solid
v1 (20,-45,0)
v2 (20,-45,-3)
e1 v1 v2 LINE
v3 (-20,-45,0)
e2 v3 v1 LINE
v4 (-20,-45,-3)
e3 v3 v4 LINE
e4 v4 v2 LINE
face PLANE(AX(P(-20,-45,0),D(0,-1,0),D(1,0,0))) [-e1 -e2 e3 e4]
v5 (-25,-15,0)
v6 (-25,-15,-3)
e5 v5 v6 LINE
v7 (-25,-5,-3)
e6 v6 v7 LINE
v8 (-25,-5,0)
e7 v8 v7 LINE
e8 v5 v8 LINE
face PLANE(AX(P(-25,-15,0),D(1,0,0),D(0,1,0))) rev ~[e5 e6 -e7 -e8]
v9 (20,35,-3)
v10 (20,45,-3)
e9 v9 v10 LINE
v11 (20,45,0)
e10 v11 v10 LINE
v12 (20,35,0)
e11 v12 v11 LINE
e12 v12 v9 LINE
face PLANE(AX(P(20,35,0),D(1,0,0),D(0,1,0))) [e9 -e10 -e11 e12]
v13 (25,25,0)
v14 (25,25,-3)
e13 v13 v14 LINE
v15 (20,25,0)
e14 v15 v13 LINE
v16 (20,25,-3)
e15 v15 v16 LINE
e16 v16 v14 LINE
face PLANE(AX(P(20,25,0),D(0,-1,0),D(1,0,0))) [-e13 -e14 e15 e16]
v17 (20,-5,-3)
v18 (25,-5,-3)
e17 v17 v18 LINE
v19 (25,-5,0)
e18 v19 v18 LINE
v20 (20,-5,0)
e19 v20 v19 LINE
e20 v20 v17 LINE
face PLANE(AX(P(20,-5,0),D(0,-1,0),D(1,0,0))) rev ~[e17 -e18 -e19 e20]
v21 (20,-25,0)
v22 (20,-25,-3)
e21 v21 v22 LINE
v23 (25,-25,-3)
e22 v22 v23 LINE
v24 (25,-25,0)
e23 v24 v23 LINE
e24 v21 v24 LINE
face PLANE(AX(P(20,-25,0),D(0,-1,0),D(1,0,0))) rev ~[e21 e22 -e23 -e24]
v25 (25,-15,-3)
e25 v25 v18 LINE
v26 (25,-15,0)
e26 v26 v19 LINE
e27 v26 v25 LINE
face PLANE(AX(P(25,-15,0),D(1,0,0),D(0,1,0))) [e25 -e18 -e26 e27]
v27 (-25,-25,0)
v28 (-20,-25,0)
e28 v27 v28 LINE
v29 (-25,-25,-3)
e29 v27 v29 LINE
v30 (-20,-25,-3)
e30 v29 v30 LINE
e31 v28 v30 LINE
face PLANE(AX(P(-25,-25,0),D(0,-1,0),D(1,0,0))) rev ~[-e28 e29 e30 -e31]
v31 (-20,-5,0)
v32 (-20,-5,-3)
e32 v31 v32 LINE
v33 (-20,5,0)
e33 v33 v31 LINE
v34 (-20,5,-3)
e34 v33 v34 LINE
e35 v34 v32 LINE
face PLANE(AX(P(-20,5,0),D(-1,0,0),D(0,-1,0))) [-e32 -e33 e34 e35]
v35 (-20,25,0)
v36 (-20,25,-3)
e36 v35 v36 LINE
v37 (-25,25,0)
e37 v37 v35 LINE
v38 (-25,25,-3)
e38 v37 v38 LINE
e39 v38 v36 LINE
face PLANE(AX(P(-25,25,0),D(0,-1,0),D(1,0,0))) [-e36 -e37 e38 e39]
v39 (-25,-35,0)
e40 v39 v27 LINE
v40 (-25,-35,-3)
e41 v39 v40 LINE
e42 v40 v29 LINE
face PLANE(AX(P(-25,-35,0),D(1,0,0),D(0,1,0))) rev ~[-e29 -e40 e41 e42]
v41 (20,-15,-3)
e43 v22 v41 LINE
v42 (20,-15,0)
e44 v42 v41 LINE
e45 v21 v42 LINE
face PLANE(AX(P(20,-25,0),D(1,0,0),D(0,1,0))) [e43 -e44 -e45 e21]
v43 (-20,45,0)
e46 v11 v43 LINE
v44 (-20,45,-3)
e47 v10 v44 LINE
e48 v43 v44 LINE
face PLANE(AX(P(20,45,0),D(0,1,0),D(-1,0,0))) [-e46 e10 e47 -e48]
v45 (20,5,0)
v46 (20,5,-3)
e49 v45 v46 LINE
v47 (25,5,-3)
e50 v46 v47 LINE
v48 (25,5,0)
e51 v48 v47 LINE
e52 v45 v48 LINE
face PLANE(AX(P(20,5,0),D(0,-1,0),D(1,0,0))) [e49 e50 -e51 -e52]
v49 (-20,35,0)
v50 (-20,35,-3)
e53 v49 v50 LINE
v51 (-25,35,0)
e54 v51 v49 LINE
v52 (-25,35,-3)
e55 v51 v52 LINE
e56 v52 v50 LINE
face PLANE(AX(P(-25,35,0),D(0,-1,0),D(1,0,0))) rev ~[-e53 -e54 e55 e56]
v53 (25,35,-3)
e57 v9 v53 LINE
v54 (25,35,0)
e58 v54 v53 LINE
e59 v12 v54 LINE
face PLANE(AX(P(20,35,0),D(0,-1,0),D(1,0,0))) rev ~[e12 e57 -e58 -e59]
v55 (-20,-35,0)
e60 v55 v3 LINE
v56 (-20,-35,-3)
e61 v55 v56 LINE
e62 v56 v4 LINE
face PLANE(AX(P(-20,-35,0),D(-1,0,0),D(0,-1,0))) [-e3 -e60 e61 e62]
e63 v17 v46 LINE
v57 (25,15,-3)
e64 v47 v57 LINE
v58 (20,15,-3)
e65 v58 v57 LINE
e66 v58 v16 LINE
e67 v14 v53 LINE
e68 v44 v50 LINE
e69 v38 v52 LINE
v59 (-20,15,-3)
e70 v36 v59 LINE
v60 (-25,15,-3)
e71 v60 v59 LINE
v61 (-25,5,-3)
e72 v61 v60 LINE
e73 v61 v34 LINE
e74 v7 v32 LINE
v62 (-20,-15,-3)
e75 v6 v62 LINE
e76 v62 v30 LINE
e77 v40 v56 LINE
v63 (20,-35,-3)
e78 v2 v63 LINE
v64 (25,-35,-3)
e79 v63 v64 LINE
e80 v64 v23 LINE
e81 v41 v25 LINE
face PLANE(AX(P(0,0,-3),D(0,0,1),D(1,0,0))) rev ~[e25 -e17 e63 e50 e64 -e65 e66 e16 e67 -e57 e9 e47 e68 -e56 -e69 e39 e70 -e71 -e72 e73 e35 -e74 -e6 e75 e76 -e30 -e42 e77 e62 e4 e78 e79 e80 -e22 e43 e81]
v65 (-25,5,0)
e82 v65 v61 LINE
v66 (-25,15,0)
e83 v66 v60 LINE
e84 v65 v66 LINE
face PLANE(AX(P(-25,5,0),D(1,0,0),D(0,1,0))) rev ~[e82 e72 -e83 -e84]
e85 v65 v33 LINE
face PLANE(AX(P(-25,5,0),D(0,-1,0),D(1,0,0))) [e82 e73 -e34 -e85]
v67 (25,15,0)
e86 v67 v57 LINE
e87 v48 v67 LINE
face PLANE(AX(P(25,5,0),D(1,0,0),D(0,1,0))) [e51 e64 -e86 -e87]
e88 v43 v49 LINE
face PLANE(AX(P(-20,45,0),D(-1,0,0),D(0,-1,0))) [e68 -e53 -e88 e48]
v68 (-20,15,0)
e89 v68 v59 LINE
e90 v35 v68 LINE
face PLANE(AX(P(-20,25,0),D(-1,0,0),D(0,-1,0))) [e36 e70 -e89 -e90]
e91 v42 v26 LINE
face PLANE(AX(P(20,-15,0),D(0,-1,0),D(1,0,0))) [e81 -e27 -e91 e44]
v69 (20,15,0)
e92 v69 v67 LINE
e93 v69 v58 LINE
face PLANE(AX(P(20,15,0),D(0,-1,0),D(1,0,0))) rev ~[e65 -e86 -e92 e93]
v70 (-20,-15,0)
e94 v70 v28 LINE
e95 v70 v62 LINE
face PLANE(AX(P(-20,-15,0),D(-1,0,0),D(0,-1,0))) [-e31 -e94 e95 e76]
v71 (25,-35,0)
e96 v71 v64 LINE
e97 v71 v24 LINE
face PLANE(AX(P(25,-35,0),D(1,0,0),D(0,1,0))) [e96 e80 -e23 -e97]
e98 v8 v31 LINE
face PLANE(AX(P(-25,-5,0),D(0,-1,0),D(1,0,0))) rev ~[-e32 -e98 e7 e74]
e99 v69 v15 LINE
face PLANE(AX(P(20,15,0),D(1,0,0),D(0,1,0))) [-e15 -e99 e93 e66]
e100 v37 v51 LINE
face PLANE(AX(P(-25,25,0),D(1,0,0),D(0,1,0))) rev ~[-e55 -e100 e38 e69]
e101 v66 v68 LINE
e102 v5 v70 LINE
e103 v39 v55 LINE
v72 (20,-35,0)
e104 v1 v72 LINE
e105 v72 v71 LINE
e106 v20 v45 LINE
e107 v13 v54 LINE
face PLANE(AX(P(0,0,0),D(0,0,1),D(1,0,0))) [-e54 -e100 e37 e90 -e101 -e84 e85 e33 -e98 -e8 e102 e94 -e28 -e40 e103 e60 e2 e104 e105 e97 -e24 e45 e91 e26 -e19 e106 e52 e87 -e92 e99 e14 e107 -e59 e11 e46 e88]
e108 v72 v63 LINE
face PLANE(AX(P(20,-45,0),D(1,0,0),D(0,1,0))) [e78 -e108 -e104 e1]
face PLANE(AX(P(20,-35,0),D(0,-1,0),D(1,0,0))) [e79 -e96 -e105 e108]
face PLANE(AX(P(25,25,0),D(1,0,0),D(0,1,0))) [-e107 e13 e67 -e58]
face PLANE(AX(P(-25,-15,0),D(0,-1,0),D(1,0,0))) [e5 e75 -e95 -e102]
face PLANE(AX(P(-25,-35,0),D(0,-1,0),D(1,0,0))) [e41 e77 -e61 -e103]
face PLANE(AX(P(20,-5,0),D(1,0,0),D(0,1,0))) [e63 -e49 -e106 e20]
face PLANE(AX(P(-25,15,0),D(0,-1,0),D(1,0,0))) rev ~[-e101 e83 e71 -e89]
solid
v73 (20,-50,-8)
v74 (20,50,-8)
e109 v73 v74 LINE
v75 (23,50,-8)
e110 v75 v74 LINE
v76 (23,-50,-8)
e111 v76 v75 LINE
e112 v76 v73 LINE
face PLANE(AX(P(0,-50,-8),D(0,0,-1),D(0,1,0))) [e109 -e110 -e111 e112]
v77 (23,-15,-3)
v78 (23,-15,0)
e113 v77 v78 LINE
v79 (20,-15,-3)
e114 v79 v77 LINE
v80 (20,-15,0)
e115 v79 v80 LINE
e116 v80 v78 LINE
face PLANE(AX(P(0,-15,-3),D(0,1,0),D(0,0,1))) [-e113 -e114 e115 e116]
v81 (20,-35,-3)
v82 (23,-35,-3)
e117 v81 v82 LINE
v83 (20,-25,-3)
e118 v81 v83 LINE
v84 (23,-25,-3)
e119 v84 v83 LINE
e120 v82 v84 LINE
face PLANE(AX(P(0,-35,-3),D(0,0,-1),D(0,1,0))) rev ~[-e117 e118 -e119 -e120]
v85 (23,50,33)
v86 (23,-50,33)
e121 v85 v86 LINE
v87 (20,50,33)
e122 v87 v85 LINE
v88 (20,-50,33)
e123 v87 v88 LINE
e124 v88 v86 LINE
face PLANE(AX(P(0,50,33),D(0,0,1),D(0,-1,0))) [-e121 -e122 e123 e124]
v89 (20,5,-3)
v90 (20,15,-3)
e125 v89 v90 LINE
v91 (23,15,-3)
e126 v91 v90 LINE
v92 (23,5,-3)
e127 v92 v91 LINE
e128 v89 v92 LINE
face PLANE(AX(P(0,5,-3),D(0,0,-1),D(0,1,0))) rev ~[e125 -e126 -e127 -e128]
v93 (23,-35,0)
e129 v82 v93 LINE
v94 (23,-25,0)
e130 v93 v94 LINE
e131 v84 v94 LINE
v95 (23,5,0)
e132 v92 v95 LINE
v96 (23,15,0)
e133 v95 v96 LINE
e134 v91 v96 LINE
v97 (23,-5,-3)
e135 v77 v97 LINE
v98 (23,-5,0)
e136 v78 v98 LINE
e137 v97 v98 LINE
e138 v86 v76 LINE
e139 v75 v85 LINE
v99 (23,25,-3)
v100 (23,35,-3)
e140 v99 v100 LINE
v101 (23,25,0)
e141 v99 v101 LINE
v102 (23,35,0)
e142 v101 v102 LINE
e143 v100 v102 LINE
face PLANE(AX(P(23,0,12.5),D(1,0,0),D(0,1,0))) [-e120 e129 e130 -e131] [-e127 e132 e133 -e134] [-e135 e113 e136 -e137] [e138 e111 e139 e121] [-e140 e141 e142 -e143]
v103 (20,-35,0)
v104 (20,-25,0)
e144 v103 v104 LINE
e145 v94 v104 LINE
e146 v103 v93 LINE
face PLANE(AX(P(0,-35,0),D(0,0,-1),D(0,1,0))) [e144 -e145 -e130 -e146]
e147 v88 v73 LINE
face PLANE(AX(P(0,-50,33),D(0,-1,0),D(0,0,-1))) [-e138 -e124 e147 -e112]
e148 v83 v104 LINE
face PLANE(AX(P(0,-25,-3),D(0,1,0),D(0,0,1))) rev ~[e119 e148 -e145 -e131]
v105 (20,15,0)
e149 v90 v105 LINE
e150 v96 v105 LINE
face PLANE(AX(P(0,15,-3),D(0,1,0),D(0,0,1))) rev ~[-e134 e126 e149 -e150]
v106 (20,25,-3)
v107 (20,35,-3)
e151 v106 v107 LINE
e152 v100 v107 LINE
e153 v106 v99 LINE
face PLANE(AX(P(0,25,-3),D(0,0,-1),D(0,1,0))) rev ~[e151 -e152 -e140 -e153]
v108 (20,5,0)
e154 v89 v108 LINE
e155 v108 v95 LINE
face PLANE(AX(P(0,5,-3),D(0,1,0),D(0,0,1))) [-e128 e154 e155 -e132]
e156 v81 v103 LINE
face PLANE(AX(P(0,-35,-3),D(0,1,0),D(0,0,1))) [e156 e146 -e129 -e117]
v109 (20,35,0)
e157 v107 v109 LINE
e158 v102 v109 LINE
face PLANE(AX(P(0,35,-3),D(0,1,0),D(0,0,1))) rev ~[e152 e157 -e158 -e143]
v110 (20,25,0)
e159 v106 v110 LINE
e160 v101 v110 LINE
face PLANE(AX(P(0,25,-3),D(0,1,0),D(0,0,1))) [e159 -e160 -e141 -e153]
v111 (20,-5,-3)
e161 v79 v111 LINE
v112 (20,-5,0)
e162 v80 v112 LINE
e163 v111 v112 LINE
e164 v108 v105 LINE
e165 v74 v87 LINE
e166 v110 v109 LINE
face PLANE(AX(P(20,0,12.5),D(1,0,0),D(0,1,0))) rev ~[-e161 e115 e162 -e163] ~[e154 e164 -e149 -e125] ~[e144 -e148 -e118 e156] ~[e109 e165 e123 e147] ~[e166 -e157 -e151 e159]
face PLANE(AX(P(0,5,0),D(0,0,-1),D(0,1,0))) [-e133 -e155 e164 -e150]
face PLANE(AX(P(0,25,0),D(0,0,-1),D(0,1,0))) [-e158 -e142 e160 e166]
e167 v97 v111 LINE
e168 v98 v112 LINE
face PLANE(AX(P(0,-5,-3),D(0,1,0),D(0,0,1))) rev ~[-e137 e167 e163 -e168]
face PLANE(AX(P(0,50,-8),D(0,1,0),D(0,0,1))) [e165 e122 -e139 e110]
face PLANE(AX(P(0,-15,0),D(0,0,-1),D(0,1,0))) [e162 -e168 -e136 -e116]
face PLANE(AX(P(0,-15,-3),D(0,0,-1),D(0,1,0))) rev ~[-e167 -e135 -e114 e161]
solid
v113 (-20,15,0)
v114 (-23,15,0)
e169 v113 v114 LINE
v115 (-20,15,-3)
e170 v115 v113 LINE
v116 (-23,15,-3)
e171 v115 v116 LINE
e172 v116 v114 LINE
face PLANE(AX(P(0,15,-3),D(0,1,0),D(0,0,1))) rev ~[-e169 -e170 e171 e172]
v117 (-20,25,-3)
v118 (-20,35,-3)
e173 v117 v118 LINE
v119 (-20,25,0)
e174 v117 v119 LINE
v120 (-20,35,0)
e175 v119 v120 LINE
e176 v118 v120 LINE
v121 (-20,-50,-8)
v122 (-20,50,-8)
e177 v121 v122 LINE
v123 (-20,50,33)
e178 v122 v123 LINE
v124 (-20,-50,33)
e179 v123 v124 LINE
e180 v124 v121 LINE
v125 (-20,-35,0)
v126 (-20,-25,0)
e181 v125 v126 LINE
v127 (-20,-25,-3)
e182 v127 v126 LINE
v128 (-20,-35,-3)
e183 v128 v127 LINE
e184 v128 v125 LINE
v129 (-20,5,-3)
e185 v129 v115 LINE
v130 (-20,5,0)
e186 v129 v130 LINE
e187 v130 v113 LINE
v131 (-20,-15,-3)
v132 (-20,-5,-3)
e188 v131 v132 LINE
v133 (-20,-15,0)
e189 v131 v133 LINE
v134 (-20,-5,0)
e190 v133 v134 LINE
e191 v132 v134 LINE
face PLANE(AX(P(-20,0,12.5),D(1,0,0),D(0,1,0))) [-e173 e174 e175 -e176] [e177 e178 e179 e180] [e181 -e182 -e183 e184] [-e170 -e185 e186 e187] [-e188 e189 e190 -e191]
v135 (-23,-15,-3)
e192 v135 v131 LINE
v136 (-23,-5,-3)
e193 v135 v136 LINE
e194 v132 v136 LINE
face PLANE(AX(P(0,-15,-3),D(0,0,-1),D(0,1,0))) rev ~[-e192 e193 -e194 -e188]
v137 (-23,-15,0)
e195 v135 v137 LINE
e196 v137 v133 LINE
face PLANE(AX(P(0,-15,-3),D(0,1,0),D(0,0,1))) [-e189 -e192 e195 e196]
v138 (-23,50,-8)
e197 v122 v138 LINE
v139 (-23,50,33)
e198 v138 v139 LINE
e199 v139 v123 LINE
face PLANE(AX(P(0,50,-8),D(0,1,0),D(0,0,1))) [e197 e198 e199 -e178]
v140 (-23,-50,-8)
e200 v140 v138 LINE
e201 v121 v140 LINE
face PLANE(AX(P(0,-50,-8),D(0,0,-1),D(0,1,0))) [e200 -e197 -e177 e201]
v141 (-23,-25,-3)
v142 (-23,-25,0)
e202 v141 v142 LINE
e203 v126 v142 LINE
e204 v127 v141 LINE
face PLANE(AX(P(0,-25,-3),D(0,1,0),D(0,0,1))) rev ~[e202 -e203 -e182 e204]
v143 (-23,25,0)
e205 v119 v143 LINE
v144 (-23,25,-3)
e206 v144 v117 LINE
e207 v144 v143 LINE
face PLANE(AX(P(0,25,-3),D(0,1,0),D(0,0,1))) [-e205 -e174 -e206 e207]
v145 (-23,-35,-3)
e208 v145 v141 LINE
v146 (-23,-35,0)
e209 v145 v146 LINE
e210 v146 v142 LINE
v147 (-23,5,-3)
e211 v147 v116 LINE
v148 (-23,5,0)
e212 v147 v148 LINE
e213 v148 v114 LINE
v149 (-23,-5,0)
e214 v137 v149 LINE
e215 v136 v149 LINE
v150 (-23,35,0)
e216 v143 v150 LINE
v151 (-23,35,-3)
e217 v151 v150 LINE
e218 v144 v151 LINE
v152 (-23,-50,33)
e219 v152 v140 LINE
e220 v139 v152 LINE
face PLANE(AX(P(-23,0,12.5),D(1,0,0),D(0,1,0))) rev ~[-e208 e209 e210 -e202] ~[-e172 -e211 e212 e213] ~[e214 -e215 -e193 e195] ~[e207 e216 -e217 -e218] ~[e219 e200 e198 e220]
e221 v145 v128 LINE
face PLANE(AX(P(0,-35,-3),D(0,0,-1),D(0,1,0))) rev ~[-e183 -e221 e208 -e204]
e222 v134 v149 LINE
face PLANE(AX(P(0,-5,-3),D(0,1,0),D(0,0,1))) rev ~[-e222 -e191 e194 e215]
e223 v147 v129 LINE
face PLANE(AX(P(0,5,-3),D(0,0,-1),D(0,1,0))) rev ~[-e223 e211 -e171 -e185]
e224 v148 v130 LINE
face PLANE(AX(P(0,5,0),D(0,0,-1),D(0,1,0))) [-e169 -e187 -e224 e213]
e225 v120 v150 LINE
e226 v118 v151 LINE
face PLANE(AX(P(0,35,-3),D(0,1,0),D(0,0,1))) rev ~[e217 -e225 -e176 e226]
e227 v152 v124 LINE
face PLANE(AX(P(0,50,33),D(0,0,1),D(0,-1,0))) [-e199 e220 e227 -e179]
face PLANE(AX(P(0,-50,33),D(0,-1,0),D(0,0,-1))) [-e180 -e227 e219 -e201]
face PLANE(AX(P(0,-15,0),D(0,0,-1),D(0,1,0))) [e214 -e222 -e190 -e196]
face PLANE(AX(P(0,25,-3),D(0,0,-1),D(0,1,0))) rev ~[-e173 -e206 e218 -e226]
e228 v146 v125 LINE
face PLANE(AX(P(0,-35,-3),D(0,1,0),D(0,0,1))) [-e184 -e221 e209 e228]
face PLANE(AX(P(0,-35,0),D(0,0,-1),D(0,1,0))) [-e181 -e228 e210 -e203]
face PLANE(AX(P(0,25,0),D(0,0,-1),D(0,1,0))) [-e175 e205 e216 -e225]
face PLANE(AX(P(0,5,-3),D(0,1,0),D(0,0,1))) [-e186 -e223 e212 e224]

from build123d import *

# Parameters (mm, degrees)
F2_W     = 5
F2_H     = 10
F3_DEPTH = 3
F4_W     = 10
F4_H     = 3
F5_DEPTH = 23
F6_DEPTH = 20


with BuildPart() as f3:
    # F2 (on Top) → F3 (new body)
    with BuildSketch(Plane.XY):
        Polygon((-20, -45), (20, -45), (20, -35), (20, -25), (20, -15), (20, -5), (20, 5), (20, 15), (20, 25), (20, 35), (20, 45), (-20, 45), (-20, 35), (-20, 25), (-20, 15), (-20, 5), (-20, -5), (-20, -15), (-20, -25), (-20, -35), align=None)
        with Locations((-22.5, 10)):
            Rectangle(F2_W, F2_H)
        with Locations((-22.5, -10)):
            Rectangle(F2_W, F2_H)
        with Locations((-22.5, -30)):
            Rectangle(F2_W, F2_H)
        with Locations((-22.5, 30)):
            Rectangle(F2_W, F2_H)
        with Locations((22.5, 30)):
            Rectangle(F2_W, F2_H)
        with Locations((22.5, 10)):
            Rectangle(F2_W, F2_H)
        with Locations((22.5, -10)):
            Rectangle(F2_W, F2_H)
        with Locations((22.5, -30)):
            Rectangle(F2_W, F2_H)
    extrude(amount=-F3_DEPTH)


with BuildPart() as f5:
    # F4 (on Right) → F5 (new body, symmetric)
    with BuildSketch(Plane.YZ):
        Polygon((50, -8), (50, 0), (50, 33), (-50, 33), (-50, -8), align=None)
        with Locations((-30, -1.5)):
            Rectangle(F4_W, F4_H, mode=Mode.SUBTRACT)
        with Locations((-10, -1.5)):
            Rectangle(F4_W, F4_H, mode=Mode.SUBTRACT)
        with Locations((10, -1.5)):
            Rectangle(F4_W, F4_H, mode=Mode.SUBTRACT)
        with Locations((30, -1.5)):
            Rectangle(F4_W, F4_H, mode=Mode.SUBTRACT)
    extrude(amount=F5_DEPTH, both=True)

    # F4 (on Right) → F6 (cut, symmetric)
    with BuildSketch(Plane.YZ):
        Polygon((50, -8), (50, 0), (50, 33), (-50, 33), (-50, -8), align=None)
        with Locations((-30, -1.5)):
            Rectangle(F4_W, F4_H, mode=Mode.SUBTRACT)
        with Locations((-10, -1.5)):
            Rectangle(F4_W, F4_H, mode=Mode.SUBTRACT)
        with Locations((10, -1.5)):
            Rectangle(F4_W, F4_H, mode=Mode.SUBTRACT)
        with Locations((30, -1.5)):
            Rectangle(F4_W, F4_H, mode=Mode.SUBTRACT)
    extrude(amount=F6_DEPTH, both=True, mode=Mode.SUBTRACT)


solid = Compound([f3.part, f5.part])
